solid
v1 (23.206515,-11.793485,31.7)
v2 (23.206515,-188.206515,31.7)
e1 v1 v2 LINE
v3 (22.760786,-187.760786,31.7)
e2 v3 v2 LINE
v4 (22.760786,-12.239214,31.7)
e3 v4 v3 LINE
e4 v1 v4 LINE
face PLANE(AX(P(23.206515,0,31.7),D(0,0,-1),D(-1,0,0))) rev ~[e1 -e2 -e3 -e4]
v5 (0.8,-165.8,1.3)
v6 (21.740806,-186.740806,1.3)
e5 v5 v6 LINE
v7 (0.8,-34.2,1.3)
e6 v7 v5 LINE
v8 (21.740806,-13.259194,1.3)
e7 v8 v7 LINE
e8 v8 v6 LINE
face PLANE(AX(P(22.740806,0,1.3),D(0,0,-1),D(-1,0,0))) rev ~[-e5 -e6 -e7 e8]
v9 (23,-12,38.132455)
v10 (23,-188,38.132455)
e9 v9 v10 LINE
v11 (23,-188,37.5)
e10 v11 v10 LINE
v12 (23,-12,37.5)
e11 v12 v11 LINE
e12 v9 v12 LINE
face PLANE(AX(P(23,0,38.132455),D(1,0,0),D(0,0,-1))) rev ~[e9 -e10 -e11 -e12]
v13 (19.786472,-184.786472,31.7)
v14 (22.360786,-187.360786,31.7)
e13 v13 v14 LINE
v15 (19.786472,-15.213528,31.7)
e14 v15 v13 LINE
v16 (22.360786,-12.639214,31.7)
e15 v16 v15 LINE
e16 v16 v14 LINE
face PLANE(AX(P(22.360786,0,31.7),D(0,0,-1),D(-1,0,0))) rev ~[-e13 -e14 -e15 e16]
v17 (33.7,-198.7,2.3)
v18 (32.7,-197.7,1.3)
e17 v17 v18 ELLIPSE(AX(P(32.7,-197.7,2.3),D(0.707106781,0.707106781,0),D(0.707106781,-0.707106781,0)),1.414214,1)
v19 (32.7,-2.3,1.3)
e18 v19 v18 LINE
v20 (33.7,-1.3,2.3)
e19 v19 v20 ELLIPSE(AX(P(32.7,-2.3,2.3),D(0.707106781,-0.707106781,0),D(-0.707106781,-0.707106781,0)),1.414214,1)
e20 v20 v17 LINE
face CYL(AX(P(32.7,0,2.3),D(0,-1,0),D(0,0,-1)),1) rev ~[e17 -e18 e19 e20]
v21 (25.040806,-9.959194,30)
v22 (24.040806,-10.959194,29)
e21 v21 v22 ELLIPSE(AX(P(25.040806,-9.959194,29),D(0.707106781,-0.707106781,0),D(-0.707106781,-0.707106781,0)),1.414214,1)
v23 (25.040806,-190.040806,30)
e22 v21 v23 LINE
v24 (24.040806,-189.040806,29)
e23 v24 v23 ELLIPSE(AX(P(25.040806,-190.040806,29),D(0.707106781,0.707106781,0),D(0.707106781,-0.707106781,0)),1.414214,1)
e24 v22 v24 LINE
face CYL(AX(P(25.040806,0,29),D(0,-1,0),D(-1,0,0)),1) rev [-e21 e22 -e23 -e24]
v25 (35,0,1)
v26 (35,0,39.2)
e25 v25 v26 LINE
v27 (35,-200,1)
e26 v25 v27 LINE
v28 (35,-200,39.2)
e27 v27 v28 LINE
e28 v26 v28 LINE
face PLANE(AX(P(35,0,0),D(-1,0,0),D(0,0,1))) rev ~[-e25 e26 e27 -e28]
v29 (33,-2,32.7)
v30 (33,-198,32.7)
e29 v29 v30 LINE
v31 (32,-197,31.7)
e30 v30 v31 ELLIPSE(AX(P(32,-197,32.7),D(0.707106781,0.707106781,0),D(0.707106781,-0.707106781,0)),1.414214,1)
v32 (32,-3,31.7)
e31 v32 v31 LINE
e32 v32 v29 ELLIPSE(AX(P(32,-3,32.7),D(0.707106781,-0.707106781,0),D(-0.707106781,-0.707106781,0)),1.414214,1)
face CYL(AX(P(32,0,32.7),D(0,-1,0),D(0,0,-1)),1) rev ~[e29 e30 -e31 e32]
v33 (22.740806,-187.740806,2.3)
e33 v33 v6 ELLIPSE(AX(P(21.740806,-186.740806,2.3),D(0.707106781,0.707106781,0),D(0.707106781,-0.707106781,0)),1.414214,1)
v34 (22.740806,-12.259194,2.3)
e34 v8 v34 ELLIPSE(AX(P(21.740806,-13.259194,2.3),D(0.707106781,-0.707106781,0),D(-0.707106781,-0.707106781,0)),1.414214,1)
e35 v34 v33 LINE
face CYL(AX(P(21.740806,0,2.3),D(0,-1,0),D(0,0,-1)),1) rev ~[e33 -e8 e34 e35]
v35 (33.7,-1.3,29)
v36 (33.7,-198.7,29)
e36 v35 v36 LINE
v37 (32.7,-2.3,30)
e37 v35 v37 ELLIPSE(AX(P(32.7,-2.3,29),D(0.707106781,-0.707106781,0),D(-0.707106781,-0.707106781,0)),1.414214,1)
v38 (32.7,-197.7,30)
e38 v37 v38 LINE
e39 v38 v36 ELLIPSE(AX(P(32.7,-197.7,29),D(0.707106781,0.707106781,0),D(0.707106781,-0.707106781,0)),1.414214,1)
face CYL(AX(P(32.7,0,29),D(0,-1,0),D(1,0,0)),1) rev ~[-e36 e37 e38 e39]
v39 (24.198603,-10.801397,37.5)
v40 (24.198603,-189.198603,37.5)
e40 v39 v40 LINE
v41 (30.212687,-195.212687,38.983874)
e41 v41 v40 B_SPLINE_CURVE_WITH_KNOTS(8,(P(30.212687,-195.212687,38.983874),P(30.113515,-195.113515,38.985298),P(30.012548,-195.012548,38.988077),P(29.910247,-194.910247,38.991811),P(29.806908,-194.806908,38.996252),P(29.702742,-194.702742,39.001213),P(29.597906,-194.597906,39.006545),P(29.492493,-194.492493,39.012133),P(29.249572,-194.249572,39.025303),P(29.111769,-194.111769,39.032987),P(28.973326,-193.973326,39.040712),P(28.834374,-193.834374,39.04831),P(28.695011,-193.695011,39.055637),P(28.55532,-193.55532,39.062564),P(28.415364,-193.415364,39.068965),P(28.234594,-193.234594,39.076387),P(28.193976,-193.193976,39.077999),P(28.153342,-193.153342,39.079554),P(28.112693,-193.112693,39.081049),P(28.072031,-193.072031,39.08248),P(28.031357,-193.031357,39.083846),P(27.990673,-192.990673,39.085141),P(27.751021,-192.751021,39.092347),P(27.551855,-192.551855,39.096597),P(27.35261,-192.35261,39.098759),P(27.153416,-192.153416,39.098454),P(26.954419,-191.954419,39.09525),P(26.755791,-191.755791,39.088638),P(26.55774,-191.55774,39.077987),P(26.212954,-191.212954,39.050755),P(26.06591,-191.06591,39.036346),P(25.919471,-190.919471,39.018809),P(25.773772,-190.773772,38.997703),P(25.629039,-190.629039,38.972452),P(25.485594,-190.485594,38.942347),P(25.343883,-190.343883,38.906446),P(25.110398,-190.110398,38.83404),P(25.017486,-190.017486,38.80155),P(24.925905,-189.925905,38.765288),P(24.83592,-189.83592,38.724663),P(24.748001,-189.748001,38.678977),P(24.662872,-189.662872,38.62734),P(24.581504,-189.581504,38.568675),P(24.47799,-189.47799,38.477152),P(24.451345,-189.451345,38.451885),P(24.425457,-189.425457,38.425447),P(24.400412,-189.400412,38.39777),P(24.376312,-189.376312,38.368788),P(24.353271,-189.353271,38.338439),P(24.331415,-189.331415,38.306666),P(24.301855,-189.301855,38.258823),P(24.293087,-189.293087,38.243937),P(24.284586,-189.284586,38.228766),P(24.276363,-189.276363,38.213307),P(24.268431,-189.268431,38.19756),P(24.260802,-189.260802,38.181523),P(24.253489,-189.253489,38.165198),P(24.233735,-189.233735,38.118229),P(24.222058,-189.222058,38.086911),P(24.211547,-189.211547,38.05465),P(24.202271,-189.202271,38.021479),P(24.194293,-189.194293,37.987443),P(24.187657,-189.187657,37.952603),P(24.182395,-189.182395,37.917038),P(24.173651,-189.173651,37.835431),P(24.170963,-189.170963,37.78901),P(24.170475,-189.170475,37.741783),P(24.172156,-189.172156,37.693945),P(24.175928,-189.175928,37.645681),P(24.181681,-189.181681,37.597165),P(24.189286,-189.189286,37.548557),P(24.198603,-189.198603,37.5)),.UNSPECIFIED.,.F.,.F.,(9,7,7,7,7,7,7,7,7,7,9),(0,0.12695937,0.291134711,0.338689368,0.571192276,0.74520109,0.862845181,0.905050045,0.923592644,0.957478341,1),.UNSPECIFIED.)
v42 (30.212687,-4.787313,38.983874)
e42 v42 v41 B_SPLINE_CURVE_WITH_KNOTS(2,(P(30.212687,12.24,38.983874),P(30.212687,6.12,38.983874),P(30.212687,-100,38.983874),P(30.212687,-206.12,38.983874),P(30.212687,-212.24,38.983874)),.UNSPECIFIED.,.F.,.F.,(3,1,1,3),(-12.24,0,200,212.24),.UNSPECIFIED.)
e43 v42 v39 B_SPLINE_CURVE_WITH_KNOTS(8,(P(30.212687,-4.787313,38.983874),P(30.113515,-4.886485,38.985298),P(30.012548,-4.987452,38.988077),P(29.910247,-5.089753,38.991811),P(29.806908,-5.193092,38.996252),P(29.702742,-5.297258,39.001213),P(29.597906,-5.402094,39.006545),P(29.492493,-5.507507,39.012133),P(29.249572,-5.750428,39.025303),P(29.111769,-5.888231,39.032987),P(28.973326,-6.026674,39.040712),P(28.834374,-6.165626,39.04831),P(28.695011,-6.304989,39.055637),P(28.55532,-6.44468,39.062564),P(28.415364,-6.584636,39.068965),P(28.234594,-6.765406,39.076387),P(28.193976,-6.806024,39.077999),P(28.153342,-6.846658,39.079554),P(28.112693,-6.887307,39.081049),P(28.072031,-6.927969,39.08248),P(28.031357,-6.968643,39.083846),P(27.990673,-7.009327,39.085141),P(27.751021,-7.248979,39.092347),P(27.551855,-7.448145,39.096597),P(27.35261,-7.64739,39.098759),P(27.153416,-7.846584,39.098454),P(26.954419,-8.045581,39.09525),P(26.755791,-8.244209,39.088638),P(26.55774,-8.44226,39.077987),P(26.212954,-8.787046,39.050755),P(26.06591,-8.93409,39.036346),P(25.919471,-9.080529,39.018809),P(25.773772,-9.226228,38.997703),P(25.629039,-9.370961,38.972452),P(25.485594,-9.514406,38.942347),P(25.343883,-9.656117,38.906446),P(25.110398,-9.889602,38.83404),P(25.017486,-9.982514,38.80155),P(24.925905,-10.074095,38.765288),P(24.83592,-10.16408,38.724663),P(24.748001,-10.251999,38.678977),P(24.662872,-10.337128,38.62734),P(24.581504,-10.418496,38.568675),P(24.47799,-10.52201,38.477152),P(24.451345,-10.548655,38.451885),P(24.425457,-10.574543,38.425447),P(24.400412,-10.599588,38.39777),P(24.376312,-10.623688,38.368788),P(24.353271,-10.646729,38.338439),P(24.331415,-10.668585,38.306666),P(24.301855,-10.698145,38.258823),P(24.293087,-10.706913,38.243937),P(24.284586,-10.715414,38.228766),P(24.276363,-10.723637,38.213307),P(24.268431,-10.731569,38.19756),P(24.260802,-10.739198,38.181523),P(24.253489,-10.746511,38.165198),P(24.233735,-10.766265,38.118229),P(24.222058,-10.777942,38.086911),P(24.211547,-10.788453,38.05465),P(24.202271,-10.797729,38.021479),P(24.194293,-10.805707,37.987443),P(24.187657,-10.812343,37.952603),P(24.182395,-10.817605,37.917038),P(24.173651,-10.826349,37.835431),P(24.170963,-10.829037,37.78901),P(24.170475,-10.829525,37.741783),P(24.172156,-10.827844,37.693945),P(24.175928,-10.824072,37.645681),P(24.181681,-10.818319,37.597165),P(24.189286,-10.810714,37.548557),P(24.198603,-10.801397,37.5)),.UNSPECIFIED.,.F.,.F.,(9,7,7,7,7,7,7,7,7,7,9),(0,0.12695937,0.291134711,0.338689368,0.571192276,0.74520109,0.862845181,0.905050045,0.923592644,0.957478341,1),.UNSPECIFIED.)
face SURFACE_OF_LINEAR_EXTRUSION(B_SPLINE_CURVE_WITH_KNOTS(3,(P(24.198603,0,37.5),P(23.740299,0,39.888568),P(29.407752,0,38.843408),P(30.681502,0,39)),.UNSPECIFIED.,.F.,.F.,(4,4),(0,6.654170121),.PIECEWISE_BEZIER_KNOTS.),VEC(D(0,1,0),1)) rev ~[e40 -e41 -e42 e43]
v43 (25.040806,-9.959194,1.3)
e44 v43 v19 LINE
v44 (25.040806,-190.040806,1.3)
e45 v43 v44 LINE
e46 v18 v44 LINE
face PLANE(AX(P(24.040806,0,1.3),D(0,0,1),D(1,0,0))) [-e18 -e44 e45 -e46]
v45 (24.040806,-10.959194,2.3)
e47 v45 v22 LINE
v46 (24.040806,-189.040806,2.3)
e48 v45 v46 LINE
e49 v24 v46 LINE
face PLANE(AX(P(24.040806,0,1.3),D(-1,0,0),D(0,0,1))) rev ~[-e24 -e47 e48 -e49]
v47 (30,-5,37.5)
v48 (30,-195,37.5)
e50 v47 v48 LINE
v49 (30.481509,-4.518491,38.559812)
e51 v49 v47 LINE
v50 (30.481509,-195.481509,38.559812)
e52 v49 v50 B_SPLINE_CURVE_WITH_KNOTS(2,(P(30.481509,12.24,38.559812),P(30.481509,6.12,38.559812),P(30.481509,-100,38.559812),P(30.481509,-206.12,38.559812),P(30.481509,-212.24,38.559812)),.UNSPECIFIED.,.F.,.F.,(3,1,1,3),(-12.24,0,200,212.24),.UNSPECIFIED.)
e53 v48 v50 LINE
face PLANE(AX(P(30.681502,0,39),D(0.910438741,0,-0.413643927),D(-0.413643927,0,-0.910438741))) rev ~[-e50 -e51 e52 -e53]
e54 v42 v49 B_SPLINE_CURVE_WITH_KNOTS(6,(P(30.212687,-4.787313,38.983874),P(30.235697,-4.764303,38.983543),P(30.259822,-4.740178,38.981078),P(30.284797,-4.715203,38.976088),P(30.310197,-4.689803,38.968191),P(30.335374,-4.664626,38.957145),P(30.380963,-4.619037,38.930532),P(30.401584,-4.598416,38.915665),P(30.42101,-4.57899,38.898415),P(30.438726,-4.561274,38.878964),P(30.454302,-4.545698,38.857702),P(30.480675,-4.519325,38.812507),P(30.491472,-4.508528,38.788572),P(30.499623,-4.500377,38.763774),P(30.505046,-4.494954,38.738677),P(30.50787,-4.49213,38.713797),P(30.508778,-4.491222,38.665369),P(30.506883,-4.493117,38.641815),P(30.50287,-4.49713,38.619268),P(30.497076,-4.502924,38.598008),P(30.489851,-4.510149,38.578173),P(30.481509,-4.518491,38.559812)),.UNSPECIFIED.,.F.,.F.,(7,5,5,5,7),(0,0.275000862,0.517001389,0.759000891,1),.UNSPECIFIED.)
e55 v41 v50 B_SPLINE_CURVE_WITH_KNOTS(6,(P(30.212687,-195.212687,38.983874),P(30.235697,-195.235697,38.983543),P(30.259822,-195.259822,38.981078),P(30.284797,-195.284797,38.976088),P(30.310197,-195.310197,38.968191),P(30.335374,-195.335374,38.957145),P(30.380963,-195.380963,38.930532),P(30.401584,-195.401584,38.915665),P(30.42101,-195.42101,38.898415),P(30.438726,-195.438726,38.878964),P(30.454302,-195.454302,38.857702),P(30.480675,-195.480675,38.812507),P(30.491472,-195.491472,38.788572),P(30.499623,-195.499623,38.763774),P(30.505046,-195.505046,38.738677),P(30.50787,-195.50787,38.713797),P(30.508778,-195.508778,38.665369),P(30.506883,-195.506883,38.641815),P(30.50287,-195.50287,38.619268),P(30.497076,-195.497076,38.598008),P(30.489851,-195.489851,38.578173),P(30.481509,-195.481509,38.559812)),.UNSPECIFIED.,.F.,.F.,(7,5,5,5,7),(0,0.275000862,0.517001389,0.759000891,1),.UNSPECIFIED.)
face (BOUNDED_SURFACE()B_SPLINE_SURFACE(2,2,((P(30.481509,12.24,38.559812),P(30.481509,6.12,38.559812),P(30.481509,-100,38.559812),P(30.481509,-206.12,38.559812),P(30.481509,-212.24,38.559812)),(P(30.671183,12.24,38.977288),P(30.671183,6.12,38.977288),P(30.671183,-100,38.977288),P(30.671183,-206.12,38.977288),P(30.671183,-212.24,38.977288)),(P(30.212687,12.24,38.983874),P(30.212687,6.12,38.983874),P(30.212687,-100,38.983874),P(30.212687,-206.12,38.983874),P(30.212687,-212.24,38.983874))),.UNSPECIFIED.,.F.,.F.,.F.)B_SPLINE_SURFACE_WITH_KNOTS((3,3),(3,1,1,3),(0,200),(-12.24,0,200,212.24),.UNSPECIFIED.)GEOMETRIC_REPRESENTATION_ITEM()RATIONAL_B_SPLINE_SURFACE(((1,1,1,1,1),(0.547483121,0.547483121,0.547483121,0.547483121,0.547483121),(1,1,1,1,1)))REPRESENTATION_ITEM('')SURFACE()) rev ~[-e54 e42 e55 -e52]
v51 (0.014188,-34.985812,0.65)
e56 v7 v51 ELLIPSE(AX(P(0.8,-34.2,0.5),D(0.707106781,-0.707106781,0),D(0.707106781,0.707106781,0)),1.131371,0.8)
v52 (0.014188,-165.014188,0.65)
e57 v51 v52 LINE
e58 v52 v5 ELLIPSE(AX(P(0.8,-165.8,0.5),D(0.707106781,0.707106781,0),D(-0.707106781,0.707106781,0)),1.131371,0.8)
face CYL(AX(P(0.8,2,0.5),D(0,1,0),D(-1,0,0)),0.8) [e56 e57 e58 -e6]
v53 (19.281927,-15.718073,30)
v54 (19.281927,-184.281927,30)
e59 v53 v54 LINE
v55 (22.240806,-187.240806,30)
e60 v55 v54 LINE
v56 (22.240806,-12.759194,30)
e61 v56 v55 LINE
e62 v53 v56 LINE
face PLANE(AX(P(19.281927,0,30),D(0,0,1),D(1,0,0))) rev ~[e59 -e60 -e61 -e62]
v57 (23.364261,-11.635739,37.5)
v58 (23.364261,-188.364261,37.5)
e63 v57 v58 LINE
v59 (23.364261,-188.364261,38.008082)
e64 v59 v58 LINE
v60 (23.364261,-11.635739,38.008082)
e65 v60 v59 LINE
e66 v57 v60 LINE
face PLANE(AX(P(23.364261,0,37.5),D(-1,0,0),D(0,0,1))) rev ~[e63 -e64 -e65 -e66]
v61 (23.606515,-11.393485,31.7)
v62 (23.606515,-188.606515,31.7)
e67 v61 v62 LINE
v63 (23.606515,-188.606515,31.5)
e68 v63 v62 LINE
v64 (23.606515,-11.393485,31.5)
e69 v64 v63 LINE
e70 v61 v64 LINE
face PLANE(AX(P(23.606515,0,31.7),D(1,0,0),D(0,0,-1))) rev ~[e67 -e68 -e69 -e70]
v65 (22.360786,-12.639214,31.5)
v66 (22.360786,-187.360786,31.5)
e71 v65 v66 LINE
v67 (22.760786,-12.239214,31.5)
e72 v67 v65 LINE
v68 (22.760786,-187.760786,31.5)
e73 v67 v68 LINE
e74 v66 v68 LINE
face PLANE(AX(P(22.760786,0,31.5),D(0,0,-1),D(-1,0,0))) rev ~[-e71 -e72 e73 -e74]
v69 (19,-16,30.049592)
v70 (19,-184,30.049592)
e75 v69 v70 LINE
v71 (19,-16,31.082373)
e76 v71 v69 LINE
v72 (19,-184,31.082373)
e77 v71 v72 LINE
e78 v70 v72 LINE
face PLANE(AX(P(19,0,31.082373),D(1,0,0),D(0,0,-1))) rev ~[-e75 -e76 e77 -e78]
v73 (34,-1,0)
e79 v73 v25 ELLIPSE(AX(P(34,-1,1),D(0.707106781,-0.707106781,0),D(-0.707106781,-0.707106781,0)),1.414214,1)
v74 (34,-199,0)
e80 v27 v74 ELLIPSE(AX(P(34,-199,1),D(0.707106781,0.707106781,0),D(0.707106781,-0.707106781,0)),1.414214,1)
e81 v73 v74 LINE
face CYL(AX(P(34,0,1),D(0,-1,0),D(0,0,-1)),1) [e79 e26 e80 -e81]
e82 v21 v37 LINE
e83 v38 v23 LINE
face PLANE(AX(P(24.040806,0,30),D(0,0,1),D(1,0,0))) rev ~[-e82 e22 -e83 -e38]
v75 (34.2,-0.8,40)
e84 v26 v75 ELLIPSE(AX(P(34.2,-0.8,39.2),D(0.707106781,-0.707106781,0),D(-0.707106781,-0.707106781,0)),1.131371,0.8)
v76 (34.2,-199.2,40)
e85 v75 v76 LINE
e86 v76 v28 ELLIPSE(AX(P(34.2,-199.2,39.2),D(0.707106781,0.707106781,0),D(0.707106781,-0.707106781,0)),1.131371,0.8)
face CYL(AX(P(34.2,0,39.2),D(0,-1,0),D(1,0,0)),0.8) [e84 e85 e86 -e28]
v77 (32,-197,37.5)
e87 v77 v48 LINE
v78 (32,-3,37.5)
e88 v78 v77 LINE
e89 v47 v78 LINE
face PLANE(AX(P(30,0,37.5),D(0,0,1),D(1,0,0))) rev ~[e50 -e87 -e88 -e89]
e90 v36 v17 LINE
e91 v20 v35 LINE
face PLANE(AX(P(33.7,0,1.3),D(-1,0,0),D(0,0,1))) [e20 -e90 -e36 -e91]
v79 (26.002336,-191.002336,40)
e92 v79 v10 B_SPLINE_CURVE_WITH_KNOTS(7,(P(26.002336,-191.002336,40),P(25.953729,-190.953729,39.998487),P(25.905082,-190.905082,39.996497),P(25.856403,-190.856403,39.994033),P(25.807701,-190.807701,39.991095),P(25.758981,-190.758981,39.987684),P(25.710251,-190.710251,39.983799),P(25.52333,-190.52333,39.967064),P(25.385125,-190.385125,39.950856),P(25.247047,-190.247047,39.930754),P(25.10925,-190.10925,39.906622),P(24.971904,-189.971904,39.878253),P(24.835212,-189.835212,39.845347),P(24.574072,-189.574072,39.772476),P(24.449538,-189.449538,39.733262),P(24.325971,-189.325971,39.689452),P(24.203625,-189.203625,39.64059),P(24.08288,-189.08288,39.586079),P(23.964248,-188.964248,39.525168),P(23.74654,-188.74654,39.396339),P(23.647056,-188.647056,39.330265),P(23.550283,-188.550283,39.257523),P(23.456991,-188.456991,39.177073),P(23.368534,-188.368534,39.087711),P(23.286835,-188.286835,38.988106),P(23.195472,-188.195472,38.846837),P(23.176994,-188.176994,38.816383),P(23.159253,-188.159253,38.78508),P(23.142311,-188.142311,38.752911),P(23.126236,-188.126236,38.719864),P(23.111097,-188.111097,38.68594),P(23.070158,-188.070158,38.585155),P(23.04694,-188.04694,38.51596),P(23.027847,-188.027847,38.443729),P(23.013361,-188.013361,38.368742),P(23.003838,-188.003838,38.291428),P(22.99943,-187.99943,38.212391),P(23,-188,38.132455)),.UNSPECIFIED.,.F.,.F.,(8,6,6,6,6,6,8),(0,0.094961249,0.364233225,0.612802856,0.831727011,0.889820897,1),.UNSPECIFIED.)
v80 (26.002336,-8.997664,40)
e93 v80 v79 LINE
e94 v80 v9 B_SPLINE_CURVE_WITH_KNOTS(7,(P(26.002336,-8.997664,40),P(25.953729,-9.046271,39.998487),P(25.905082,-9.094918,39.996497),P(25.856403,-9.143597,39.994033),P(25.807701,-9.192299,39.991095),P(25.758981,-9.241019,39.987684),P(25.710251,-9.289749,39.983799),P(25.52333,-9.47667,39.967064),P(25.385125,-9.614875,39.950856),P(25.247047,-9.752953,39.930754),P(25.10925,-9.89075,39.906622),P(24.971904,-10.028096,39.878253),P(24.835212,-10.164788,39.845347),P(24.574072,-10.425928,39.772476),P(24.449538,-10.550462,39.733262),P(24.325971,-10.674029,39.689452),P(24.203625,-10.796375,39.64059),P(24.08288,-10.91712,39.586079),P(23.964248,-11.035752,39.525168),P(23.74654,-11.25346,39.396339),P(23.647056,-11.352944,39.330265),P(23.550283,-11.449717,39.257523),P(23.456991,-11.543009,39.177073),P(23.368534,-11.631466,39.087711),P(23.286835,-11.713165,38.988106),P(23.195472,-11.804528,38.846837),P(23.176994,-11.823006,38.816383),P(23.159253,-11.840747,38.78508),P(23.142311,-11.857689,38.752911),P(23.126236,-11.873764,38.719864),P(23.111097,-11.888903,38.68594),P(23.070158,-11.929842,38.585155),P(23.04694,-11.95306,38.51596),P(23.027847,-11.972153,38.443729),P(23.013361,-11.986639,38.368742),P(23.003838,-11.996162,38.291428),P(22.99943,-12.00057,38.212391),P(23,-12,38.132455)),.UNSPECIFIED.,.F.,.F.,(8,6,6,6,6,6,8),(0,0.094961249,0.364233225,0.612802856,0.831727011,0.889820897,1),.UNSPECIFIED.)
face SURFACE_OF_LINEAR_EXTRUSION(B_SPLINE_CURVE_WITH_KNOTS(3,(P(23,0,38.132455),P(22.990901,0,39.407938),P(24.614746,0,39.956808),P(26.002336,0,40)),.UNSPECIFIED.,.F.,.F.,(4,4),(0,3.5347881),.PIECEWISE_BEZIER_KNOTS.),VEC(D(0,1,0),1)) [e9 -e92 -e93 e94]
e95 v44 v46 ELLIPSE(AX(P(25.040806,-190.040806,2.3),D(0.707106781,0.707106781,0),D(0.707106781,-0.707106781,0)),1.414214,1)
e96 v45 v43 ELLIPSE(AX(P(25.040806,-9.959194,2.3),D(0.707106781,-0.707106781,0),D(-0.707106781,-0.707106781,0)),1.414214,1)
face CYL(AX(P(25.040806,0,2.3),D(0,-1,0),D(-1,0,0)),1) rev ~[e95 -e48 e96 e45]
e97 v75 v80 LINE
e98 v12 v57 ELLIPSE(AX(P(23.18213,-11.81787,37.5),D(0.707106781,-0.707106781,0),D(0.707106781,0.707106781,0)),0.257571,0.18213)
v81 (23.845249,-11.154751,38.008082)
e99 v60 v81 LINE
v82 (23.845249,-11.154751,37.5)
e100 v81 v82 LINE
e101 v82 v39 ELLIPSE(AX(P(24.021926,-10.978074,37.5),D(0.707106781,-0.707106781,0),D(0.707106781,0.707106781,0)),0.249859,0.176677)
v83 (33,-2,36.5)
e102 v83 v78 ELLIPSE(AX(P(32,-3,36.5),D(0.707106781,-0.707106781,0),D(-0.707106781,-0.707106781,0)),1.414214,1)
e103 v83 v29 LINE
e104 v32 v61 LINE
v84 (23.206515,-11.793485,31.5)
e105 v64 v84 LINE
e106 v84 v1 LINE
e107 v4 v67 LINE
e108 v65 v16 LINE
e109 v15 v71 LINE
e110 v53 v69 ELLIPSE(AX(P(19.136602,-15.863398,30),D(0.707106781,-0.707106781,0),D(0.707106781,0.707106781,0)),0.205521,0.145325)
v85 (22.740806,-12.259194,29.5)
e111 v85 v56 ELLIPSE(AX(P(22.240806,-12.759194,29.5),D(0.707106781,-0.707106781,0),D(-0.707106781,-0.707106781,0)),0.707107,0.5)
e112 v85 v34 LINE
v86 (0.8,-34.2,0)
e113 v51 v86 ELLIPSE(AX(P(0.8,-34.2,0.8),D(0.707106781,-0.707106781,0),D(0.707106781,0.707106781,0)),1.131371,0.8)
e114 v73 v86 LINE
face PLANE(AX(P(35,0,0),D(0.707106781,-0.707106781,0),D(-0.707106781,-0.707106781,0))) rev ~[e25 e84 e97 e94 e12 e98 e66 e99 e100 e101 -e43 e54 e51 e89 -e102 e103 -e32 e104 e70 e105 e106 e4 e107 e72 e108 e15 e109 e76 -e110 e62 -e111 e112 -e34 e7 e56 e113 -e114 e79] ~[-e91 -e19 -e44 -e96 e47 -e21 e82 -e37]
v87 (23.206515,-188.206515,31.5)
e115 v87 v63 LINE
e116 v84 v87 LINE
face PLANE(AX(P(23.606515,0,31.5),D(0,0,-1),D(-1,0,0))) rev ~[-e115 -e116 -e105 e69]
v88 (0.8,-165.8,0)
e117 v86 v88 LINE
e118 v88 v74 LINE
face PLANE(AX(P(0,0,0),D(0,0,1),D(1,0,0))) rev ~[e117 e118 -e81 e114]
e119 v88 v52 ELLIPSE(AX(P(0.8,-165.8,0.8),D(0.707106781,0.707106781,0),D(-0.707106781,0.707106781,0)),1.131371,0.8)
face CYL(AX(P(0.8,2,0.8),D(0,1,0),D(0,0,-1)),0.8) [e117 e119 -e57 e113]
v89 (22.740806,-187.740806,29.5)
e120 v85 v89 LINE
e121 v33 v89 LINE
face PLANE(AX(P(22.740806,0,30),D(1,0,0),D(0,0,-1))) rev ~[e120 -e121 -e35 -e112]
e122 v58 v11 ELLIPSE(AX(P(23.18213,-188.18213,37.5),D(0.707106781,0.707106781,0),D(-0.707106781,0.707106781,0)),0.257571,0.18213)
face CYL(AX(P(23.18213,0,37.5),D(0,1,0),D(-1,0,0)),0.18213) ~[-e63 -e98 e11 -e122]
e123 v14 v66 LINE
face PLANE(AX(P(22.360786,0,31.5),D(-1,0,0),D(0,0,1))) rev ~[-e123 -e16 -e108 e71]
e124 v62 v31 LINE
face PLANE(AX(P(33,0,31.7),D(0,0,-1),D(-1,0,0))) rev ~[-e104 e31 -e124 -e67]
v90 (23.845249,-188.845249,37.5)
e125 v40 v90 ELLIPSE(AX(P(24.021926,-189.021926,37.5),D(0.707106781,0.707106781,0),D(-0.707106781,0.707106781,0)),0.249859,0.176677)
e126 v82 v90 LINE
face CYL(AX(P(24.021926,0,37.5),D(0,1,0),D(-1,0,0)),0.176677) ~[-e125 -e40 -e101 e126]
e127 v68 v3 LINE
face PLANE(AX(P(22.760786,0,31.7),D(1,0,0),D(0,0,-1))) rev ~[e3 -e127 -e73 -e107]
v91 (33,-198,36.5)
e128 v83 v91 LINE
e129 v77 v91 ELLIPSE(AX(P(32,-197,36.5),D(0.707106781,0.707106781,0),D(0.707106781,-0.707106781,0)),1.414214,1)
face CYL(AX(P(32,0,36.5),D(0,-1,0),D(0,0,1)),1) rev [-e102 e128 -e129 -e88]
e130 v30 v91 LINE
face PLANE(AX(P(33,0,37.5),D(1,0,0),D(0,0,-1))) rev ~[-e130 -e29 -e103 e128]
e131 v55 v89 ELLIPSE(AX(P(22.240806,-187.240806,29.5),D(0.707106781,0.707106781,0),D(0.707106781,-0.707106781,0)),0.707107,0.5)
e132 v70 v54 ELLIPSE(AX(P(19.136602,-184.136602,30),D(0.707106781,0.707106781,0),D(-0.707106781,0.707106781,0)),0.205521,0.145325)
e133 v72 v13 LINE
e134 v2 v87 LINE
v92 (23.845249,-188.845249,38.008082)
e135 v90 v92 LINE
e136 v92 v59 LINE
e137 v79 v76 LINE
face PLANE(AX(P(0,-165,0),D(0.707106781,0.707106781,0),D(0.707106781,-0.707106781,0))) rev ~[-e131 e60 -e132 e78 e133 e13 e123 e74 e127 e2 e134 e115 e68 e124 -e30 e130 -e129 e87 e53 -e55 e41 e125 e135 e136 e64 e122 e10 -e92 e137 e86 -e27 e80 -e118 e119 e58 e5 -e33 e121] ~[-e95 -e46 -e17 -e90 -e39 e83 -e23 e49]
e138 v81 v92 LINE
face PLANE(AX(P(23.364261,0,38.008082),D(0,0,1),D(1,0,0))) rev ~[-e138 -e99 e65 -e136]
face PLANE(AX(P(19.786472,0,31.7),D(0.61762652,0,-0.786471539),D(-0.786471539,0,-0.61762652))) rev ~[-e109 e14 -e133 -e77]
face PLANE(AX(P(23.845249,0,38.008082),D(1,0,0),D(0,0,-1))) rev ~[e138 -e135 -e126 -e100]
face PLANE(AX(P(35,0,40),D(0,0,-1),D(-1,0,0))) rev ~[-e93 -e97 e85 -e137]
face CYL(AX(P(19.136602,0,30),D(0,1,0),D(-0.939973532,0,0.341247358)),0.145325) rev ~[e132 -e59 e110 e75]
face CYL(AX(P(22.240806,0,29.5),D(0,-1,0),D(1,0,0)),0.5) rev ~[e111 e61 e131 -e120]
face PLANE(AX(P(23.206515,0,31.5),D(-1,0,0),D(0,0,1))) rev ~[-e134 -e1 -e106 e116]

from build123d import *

# Parameters (mm, degrees)
F0_W        = 9.6591939426
F0_H        = 28.7
F1_DEPTH    = 200
F3_R        = 1
F4_R        = 1
F5_R        = 1
F6_R        = 0.3
F7_T1_DEPTH = 204
F8_R        = 1
F9_R        = 0.8
F10_R       = 0.5
F11_DEPTH   = 40.0010001


# Not quite as in the source:
# - a fillet or chamfer that OpenCascade refuses, or shapes differently, is made with other operations: its cross-section is extruded or revolved along the edge and cut away or added


with BuildPart() as f1:
    # F0 (on Front) → F1 (new body)
    with BuildSketch(Plane.XZ):
        with BuildLine():
            add(Edge.make_bspline(
                [(23, 38.132454922), (22.9909009473, 39.4079380262), (24.6147458735, 39.9568075433), (26.0023356814, 40)],
                knots=[0, 0, 0, 0, 3.5347881, 3.5347881, 3.5347881, 3.5347881], degree=3))
            Line((23, 38.132454922), (23, 37.5))
            Line((23, 37.5), (23.3642607927, 37.5))
            Line((23.3642607927, 37.5), (23.3642607927, 38.0080822861))
            Line((23.3642607927, 38.0080822861), (23.8452493811, 38.0080822861))
            Line((23.8452493811, 38.0080822861), (23.8452493811, 37.5))
            Line((23.8452493811, 37.5), (24.1986030313, 37.5))
            add(Edge.make_bspline(
                [(24.1986030313, 37.5), (23.7402990776, 39.8885678506), (29.4077517188, 38.843408227), (30.681502074, 39)],
                knots=[0, 0, 0, 0, 6.6541701209, 6.6541701209, 6.6541701209, 6.6541701209], degree=3))
            Line((30.681502074, 39), (30, 37.5))
            Line((30, 37.5), (33, 37.5))
            Line((33, 37.5), (33, 31.7))
            Line((33, 31.7), (23.6065152377, 31.7))
            Line((23.6065152377, 31.7), (23.6065152377, 31.5))
            Line((23.6065152377, 31.5), (23.2065152377, 31.5))
            Line((23.2065152377, 31.5), (23.2065152377, 31.7))
            Line((23.2065152377, 31.7), (22.7607861161, 31.7))
            Line((22.7607861161, 31.7), (22.7607861161, 31.5))
            Line((22.7607861161, 31.5), (22.3607861161, 31.5))
            Line((22.3607861161, 31.5), (22.3607861161, 31.7))
            Line((22.3607861161, 31.7), (19.7864715389, 31.7))
            Line((19.7864715389, 31.7), (19, 31.0823734798))
            Line((19, 31.0823734798), (19, 30.0495919195))
            ThreePointArc((19, 30.0495919195), (19.1617787134, 30.1431279745), (19.2819274904, 30))
            Line((19.2819274904, 30), (22.7408060574, 30))
            Line((22.7408060574, 30), (22.7408060574, 1.3))
            Line((22.7408060574, 1.3), (0, 1.3))
            Line((0, 1.3), (0, 0))
            Line((0, 0), (35, 0))
            Line((35, 0), (35, 40))
            Line((35, 40), (26.3559219739, 40))
            Line((26.3559219739, 40), (26.0023356814, 40))
        make_face()
        with Locations((28.8704030287, 15.65)):
            Rectangle(F0_W, F0_H, mode=Mode.SUBTRACT)
        with BuildLine():
            Line((23.3642607927, 37.5), (23, 37.5))
            ThreePointArc((23, 37.5), (23.1821303964, 37.3178696036), (23.3642607927, 37.5))
        make_face()
        with BuildLine():
            Line((24.1986030313, 37.5), (23.8452493811, 37.5))
            ThreePointArc((23.8452493811, 37.5), (24.0219262062, 37.3233231749), (24.1986030313, 37.5))
        make_face()
    extrude(amount=F1_DEPTH)

    # F3
    f3_edges = [f1.edges().sort_by_distance(p)[0] for p in [
        (33.7, -100, 30),
        (33.7, -100, 1.3),
        (24.040806, -100, 1.3),
        (24.040806, -100, 30),
    ]]
    fillet(f3_edges, radius=F3_R)

    # F4
    f4_edges = [f1.edges().sort_by_distance(p)[0] for p in [
        (22.740806, -100, 1.3),
    ]]
    fillet(f4_edges, radius=F4_R)

    # F5
    f5_edges = [f1.edges().sort_by_distance(p)[0] for p in [
        (33, -100, 31.7),
        (33, -100, 37.5),
    ]]
    fillet(f5_edges, radius=F5_R)

    # F6
    f6_edges = [f1.edges().sort_by_distance(p)[0] for p in [
        (30.681502, -100, 39),
    ]]
    fillet(f6_edges, radius=F6_R)

    # F7: fillet of radius 0.8 on 2 edges, made by hand

    # F7_s2 → F7_t1 (cut)
    with BuildSketch(Plane.XZ.offset(-2)):
        with BuildLine():
            ThreePointArc((0, 0.5), (0.2343145751, 1.0656854249), (0.8, 1.3))
            Line((0.8, 1.3), (0, 1.3))
            Line((0, 1.3), (0, 0.5))
        make_face()
        with BuildLine():
            ThreePointArc((0.8, 0), (0.2343145751, 0.2343145751), (0, 0.8))
            Line((0, 0.8), (0, 0))
            Line((0, 0), (0.8, 0))
        make_face()
    extrude(amount=F7_T1_DEPTH, mode=Mode.SUBTRACT)

    # F8
    f8_edges = [f1.edges().sort_by_distance(p)[0] for p in [
        (35, -100, 0),
    ]]
    fillet(f8_edges, radius=F8_R)

    # F9
    f9_edges = [f1.edges().sort_by_distance(p)[0] for p in [
        (35, -100, 40),
    ]]
    fillet(f9_edges, radius=F9_R)

    # F10
    f10_edges = [f1.edges().sort_by_distance(p)[0] for p in [
        (22.740806, -100, 30),
    ]]
    fillet(f10_edges, radius=F10_R)

    # F2 (on face) → F11 (cut, through all)
    with BuildSketch(Plane(origin=(0, 0, 0), x_dir=(1, 0, 0), z_dir=(0, 0, -1))):
        Polygon((0, 165), (35, 200), (0, 200), align=None)
        Polygon((0, 0), (35, 0), (0, 35), align=None)
    extrude(amount=-F11_DEPTH, mode=Mode.SUBTRACT)


solid = f1.part
